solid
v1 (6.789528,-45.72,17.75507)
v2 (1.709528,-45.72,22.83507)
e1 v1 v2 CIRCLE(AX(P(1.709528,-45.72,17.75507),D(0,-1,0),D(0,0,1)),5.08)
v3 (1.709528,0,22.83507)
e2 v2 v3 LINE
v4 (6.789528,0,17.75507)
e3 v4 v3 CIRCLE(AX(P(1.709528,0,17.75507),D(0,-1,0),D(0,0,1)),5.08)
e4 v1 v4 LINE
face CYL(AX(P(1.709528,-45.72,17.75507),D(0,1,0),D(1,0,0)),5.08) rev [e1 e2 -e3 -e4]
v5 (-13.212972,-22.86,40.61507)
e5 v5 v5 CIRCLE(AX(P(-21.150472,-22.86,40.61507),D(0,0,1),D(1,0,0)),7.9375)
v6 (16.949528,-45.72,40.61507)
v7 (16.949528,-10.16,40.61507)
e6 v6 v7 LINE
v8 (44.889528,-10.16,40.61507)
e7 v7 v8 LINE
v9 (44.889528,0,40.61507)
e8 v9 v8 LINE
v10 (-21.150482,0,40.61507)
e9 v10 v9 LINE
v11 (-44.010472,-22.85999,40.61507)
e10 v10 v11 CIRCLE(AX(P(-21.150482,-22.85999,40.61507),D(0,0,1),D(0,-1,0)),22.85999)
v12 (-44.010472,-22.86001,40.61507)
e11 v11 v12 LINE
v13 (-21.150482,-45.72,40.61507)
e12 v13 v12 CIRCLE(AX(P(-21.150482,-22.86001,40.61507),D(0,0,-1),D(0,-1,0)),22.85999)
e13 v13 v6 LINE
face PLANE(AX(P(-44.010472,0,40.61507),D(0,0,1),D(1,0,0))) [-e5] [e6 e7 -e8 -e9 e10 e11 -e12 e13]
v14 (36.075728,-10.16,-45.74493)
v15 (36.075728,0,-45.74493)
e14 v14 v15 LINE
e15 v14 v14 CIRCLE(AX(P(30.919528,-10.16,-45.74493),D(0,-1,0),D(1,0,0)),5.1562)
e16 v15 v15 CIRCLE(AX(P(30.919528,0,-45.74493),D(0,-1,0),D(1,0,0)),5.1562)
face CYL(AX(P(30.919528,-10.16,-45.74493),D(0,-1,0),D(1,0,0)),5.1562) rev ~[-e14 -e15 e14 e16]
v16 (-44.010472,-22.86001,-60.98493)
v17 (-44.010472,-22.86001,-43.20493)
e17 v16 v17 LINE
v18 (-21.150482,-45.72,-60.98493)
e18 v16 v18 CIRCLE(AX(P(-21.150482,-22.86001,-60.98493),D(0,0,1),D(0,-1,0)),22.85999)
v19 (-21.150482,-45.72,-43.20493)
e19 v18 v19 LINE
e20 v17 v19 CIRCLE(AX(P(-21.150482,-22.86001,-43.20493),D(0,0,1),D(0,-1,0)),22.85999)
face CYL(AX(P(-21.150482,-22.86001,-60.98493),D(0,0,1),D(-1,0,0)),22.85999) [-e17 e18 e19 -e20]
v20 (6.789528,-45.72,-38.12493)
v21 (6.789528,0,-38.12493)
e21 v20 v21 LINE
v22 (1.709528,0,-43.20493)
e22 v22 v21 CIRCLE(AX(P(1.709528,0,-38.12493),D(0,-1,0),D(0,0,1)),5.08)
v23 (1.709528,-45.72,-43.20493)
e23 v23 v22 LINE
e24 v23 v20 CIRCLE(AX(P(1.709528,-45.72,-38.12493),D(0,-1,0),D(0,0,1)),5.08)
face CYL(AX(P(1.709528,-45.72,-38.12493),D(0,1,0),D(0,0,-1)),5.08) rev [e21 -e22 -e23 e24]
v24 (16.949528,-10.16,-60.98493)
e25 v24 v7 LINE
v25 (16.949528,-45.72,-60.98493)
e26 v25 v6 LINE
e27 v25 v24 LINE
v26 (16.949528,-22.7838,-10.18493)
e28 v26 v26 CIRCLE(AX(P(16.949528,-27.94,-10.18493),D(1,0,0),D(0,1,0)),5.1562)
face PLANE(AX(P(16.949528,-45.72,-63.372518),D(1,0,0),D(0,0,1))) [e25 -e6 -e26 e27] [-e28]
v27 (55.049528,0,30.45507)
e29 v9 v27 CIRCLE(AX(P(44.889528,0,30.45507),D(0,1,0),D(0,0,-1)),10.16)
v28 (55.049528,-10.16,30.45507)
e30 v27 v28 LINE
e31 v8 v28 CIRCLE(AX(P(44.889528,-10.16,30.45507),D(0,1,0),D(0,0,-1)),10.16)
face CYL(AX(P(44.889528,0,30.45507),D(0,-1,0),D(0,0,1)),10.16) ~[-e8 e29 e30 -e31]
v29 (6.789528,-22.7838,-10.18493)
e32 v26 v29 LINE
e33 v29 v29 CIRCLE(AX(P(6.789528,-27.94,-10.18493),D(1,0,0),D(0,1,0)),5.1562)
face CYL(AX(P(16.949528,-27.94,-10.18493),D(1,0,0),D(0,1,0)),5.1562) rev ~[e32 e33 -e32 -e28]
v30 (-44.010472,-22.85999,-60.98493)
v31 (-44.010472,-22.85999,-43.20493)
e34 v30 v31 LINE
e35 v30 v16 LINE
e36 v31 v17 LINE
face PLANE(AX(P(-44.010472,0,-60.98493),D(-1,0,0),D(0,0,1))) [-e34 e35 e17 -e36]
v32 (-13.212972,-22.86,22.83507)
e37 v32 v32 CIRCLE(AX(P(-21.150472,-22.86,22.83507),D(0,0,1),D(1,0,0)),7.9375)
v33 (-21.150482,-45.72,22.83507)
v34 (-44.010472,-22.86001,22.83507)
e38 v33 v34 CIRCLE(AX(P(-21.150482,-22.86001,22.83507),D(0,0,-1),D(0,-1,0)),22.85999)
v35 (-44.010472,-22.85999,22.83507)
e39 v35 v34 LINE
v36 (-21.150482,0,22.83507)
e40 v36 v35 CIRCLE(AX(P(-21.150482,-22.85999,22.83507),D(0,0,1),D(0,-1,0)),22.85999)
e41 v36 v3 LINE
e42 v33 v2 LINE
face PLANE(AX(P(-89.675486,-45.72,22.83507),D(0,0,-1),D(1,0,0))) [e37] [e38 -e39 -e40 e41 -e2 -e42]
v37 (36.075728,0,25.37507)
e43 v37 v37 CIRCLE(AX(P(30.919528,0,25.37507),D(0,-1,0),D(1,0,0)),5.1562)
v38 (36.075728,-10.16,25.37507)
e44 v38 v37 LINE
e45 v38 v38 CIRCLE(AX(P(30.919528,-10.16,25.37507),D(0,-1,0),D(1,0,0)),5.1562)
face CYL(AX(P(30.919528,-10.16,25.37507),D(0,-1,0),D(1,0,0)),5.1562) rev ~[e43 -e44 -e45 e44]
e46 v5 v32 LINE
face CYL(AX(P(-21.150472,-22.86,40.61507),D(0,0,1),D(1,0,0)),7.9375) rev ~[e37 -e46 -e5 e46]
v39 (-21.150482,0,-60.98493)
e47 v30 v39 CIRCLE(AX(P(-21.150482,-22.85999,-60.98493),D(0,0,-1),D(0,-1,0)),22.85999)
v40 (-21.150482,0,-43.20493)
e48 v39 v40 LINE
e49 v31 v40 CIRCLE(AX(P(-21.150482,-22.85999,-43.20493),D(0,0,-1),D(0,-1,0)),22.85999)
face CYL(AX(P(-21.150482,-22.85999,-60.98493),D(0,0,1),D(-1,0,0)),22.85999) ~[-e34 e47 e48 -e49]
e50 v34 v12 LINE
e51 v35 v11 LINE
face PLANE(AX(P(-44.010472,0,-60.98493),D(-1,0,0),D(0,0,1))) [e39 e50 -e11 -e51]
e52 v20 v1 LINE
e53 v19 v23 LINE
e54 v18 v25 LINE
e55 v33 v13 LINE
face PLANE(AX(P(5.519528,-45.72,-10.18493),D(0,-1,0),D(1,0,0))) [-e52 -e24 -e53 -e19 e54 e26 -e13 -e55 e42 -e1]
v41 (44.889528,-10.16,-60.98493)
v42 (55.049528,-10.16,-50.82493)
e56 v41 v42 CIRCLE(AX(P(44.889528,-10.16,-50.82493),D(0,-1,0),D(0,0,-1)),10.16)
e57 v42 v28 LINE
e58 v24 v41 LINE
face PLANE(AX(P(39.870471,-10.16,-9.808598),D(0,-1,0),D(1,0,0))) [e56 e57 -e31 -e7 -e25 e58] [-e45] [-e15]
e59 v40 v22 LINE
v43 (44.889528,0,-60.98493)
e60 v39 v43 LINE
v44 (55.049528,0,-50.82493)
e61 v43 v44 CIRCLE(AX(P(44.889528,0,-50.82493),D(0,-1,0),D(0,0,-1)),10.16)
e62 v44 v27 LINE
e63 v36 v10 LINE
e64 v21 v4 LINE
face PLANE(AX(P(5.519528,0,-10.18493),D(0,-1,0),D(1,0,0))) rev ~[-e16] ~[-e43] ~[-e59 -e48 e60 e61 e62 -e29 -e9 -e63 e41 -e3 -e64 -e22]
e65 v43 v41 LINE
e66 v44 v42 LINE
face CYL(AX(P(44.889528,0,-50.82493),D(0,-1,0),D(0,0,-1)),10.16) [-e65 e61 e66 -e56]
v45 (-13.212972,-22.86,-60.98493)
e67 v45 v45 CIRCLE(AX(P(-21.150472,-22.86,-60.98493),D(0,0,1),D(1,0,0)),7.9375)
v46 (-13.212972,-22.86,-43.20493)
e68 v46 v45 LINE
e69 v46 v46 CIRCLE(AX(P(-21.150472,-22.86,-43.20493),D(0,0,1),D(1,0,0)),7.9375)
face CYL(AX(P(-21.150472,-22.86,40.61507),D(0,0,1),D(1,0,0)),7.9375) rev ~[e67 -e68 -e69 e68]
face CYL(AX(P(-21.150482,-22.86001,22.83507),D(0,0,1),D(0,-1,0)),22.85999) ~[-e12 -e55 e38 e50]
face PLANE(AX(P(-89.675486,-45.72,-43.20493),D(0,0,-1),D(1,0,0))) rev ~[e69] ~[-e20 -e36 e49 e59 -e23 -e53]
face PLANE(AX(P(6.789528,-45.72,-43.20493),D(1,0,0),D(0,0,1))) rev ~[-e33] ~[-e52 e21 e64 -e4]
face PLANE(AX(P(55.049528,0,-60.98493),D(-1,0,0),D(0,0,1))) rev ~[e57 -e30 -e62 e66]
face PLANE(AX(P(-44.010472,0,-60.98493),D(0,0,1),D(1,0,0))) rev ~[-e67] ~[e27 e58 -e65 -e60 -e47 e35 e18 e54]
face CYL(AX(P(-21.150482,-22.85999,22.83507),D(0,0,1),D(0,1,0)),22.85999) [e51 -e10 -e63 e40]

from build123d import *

# Parameters (mm, degrees)
F0_W      = 99.06
F0_H      = 101.6
F1_DEPTH  = 45.72
F2_W      = 45.8418870593
F2_H      = 107.1278404426
F3_DEPTH  = 35.56
F4_W      = 96.4650140689
F4_H      = 66.04
F5_DEPTH  = 45.721
F6_R      = 22.85999
F7_R      = 7.9375
F8_DEPTH  = 101.601
F9_R      = 5.08
F10_R     = 10.16
F11_R     = 5.1562
F12_DEPTH = 60.961
F13_R     = 5.1562
F14_DEPTH = 10.161


# Not quite as in the source:
# - a fillet or chamfer is up to 0.001 mm smaller than in the source, because OpenCascade refuses the exact size


with BuildPart() as f1:
    # F0 (on Front) → F1 (new body)
    with BuildSketch(Plane.XZ):
        with Locations((5.5195279419, -10.1849297343)):
            Rectangle(F0_W, F0_H)
    extrude(amount=F1_DEPTH)

    # F2 (on face) → F3 (cut)
    with BuildSketch(Plane.XZ.offset(45.72)):
        with Locations((39.8704714716, -9.8085980862)):
            Rectangle(F2_W, F2_H)
    extrude(amount=-F3_DEPTH, mode=Mode.SUBTRACT)

    # F4 (on face) → F5 (cut, through all)
    with BuildSketch(Plane.XZ.offset(45.72)):
        with Locations((-41.4429790925, -10.1849297343)):
            Rectangle(F4_W, F4_H)
    extrude(amount=-F5_DEPTH, mode=Mode.SUBTRACT)

    # F6 (radius 22.86 in the source; OpenCascade refuses exactly that, so slightly less here)
    f6_edges = [f1.edges().sort_by_distance(p)[0] for p in [
        (-44.010472, 0, 31.72507),
        (-44.010472, -45.72, 31.72507),
        (-44.010472, 0, -52.09493),
        (-44.010472, -45.72, -52.09493),
    ]]
    fillet(f6_edges, radius=F6_R)

    # F7 (on face) → F8 (cut, through all)
    with BuildSketch(Plane.XY.offset(40.6150702657)):
        with Locations((-21.1504720581, -22.86)):
            Circle(F7_R)
    extrude(amount=-F8_DEPTH, mode=Mode.SUBTRACT)

    # F9
    f9_edges = [f1.edges().sort_by_distance(p)[0] for p in [
        (6.789528, -22.86, 22.83507),
        (6.789528, -22.86, -43.20493),
    ]]
    fillet(f9_edges, radius=F9_R)

    # F10
    f10_edges = [f1.edges().sort_by_distance(p)[0] for p in [
        (55.049528, -5.08, 40.61507),
        (55.049528, -5.08, -60.98493),
    ]]
    fillet(f10_edges, radius=F10_R)

    # F11 (on face) → F12 (cut, through all)
    with BuildSketch(Plane.YZ.offset(16.9495279419)):
        with Locations((-27.94, -10.1849297343)):
            Circle(F11_R)
    extrude(amount=-F12_DEPTH, mode=Mode.SUBTRACT)

    # F13 (on face) → F14 (cut, through all)
    with BuildSketch(Plane.XZ.offset(10.16)):
        with Locations((30.9195279419, 25.3750702657)):
            Circle(F13_R)
        with Locations((30.9195279419, -45.7449297343)):
            Circle(F13_R)
    extrude(amount=-F14_DEPTH, mode=Mode.SUBTRACT)


solid = f1.part
